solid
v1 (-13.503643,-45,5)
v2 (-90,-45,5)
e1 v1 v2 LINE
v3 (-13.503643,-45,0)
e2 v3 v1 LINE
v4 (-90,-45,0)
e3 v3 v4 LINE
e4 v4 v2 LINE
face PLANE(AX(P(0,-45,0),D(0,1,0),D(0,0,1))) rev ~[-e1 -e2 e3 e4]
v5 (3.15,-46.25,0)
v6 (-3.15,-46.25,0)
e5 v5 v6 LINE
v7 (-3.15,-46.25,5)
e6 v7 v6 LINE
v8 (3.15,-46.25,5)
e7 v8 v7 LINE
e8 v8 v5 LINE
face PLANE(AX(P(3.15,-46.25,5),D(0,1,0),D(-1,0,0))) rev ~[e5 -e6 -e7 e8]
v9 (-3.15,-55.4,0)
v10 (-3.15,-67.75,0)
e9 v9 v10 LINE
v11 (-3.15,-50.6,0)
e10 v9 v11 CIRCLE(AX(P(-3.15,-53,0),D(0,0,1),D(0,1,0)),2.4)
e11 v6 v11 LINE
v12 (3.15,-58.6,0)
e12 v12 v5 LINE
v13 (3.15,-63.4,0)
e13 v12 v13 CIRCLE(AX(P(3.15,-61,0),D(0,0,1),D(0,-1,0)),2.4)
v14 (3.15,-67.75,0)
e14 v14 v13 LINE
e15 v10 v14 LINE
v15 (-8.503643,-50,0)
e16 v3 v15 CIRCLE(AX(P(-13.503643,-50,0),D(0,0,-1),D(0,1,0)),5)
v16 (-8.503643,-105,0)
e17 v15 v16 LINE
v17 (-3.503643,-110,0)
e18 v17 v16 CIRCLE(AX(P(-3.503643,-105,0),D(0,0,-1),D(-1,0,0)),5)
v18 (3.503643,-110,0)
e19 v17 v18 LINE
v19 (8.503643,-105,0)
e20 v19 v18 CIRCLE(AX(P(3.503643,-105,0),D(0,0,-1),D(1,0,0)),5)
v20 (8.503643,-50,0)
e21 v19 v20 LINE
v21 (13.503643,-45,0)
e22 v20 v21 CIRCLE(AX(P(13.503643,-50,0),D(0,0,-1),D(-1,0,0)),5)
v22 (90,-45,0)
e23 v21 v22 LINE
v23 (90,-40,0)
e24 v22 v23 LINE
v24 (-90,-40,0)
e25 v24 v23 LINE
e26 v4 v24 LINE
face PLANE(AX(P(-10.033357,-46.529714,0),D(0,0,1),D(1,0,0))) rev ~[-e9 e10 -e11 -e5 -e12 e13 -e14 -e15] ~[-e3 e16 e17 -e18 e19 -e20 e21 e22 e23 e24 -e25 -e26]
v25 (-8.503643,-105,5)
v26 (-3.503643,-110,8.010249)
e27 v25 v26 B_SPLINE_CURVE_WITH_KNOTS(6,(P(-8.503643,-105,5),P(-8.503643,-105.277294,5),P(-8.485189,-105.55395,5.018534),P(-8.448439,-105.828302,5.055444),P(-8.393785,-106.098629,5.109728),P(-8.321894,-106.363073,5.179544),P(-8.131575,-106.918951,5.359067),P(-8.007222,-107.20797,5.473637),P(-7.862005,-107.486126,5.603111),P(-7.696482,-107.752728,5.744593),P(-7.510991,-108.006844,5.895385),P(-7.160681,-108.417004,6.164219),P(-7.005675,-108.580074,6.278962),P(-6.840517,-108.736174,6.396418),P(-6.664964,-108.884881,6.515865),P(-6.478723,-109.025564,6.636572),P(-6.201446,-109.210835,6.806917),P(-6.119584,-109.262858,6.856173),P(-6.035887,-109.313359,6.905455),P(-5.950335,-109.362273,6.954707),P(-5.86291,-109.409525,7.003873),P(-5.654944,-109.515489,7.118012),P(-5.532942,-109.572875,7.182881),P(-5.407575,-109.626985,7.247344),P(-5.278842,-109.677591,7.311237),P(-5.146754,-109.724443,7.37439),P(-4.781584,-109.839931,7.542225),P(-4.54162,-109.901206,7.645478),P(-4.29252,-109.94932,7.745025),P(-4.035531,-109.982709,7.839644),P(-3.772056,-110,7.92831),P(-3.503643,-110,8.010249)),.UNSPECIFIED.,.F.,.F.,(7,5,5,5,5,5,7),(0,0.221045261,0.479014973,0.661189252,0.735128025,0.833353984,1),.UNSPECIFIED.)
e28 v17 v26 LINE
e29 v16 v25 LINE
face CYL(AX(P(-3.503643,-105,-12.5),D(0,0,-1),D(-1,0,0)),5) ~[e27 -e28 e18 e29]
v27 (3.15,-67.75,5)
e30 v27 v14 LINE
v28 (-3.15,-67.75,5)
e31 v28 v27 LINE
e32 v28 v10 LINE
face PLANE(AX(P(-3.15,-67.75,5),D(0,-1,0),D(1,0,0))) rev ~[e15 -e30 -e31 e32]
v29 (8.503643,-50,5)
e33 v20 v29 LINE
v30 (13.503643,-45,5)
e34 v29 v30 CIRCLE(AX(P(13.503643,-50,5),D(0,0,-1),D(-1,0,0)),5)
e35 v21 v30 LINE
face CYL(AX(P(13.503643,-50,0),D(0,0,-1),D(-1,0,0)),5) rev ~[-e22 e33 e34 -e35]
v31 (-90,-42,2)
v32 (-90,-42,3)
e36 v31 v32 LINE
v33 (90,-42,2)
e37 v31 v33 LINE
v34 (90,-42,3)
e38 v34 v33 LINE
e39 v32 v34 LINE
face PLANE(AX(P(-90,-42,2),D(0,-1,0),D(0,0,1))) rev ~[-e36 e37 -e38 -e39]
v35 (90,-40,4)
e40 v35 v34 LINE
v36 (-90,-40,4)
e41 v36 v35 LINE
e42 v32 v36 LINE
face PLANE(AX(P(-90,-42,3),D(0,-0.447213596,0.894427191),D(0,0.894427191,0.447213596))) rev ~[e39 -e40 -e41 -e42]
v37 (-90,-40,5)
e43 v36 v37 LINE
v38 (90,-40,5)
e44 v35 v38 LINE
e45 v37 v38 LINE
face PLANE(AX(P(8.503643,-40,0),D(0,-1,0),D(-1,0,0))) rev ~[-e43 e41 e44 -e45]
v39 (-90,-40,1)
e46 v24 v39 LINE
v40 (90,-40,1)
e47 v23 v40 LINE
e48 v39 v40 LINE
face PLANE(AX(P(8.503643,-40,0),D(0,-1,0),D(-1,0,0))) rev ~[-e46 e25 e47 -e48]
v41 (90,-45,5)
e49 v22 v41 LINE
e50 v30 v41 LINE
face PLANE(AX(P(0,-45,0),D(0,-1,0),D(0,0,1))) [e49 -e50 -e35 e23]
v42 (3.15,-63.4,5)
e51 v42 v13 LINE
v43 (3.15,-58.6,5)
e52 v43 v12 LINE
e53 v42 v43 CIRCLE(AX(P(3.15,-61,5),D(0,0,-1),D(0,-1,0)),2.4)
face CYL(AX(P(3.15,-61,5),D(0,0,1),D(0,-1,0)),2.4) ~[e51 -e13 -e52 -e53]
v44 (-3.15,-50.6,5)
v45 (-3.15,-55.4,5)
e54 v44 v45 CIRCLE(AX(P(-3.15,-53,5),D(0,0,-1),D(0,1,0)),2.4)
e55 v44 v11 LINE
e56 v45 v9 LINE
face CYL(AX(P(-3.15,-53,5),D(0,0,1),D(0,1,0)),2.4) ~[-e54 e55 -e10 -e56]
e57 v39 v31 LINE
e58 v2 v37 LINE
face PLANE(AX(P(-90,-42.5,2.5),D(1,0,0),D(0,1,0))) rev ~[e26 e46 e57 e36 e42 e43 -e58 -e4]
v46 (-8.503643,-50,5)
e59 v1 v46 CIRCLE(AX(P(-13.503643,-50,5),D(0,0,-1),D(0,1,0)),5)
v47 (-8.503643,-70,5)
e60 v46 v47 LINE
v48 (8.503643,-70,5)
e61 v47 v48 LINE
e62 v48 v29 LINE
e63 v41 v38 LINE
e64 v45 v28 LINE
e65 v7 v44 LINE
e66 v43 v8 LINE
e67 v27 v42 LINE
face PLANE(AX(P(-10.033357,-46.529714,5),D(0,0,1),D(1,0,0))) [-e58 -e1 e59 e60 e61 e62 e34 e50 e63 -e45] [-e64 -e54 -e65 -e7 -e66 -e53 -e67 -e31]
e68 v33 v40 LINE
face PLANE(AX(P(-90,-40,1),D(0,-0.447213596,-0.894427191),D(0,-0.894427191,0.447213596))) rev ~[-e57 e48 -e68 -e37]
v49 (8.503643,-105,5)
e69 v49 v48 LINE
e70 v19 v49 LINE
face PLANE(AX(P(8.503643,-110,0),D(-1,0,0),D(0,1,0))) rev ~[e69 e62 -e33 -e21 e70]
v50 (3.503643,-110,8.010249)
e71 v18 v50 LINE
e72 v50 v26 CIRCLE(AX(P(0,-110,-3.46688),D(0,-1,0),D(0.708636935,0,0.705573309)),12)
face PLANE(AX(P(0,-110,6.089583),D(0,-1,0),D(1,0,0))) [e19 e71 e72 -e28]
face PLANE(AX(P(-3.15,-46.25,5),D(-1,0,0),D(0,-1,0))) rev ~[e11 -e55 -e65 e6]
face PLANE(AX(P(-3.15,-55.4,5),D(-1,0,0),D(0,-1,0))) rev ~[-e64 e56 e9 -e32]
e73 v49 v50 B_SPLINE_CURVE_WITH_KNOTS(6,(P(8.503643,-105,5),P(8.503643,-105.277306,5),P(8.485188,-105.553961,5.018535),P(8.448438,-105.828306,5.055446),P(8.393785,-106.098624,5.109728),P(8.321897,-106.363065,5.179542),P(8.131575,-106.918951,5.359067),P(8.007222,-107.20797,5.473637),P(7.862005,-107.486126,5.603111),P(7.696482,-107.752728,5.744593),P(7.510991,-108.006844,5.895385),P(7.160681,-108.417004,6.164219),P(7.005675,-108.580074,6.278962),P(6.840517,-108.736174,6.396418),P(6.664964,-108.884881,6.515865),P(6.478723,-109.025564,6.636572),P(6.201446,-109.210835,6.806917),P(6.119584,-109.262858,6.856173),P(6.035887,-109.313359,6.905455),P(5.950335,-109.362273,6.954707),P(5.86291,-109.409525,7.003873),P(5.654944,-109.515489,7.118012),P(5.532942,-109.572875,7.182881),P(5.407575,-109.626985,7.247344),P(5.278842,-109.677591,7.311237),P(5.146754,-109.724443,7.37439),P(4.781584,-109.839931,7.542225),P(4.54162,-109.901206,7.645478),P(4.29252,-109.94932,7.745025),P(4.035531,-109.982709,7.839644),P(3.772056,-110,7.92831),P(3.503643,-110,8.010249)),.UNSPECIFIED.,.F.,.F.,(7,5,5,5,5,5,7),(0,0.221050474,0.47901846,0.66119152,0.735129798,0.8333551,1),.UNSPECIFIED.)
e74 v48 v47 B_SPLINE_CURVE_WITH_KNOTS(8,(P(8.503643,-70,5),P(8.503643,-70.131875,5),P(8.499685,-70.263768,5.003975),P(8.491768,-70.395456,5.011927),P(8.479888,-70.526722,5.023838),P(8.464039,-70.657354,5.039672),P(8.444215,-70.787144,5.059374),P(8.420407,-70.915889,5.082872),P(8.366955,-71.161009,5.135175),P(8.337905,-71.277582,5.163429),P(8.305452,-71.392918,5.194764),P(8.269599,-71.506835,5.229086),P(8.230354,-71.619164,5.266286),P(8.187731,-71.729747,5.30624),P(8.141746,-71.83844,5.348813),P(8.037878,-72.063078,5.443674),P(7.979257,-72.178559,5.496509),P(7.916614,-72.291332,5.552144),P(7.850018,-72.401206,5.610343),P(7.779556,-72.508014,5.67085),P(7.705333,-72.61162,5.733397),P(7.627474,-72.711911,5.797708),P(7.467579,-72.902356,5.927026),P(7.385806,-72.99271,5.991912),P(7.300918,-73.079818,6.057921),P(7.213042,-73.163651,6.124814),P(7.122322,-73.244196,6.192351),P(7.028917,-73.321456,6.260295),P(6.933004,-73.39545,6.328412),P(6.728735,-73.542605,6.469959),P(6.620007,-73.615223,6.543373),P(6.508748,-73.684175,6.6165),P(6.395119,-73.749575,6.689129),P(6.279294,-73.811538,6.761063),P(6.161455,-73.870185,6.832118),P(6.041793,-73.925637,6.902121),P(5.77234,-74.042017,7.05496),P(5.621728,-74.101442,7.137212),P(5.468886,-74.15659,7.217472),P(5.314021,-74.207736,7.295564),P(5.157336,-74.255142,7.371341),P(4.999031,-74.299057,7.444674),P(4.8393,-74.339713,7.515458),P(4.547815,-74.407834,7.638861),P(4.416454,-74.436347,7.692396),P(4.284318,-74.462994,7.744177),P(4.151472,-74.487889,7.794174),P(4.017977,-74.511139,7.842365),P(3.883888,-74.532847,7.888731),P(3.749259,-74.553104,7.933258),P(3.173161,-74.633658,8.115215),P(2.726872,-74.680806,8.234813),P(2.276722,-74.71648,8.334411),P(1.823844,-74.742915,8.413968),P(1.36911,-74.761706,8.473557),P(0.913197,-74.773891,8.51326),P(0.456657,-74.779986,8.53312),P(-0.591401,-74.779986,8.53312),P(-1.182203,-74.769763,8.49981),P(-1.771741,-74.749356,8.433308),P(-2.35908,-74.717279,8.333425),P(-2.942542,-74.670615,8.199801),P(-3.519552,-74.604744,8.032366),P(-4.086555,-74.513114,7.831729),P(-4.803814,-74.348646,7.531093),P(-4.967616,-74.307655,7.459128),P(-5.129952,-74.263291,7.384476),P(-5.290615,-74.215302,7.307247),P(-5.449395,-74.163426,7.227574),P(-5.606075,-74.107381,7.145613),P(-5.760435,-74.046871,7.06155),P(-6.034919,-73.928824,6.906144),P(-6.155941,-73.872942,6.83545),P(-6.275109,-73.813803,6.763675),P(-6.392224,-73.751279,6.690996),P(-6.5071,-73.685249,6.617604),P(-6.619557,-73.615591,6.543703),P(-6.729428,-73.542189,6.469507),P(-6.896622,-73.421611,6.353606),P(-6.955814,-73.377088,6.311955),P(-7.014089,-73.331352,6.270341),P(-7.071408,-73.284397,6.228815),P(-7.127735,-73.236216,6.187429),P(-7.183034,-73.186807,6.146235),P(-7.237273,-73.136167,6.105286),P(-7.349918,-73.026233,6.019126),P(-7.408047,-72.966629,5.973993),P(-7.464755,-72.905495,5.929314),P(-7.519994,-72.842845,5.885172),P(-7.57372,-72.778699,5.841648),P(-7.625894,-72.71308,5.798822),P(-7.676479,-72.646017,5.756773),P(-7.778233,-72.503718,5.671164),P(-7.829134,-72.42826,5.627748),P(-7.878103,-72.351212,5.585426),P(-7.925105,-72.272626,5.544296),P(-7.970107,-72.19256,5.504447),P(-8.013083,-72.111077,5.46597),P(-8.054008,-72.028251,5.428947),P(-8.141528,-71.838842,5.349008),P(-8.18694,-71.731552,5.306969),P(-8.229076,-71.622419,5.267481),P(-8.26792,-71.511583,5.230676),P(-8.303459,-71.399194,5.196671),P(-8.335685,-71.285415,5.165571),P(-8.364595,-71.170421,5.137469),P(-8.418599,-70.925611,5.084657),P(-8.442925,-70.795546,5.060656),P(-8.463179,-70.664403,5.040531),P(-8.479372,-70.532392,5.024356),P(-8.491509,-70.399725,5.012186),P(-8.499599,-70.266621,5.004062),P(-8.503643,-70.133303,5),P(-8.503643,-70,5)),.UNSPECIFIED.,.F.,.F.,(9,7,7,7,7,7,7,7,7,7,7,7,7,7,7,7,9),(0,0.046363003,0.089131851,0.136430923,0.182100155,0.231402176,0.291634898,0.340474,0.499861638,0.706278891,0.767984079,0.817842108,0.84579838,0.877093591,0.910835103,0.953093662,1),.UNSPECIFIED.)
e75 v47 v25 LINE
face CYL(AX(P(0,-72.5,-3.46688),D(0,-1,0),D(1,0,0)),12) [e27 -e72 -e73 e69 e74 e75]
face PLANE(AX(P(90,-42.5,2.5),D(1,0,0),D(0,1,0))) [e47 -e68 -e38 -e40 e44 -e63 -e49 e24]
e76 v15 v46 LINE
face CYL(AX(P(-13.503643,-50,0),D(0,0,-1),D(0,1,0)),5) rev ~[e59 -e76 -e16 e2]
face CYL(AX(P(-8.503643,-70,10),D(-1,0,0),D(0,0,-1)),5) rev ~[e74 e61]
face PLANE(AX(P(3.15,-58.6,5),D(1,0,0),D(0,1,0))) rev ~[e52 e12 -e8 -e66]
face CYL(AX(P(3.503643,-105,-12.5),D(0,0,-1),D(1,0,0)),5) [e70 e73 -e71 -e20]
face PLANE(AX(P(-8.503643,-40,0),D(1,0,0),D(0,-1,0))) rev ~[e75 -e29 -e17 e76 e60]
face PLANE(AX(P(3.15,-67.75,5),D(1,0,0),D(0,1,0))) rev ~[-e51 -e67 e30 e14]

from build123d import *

# Parameters (mm, degrees)
F1_DEPTH      = 5
F3_DEPTH      = 5.001
F5_DEPTH      = 35
F6_W          = 5
F6_H          = 5
F7_DEPTH      = 90
F7_DEPTH_BACK = 90
F9_DEPTH      = 180.001
F10_T1_DEPTH  = 5
F10_T6_DEPTH  = 17.0072864353
F10_S7_R      = 12
F10_T8_DEPTH  = 11
F10_T9_DEPTH  = 30


# Not quite as in the source:
# - a fillet or chamfer that OpenCascade refuses, or shapes differently, is made with other operations: its cross-section is extruded or revolved along the edge and cut away or added


with BuildPart() as f1:
    # F0 (on Top) → F1 (new body)
    with BuildSketch(Plane.XY):
        Polygon((8.5036432176, -40), (-8.5036432176, -40), (-8.5036432176, -110), (0, -110), (8.5036432176, -110), align=None)
    extrude(amount=F1_DEPTH)

    # F2 (on face) → F3 (cut, through all)
    with BuildSketch(Plane.XY.offset(5)):
        with BuildLine():
            Line((-3.15, -67.75), (3.15, -67.75))
            Line((3.15, -67.75), (3.15, -63.4))
            ThreePointArc((3.15, -63.4), (0.75, -61), (3.15, -58.6))
            Line((3.15, -58.6), (3.15, -46.25))
            Line((3.15, -46.25), (-3.15, -46.25))
            Line((-3.15, -46.25), (-3.15, -50.6))
            ThreePointArc((-3.15, -50.6), (-0.75, -53), (-3.15, -55.4))
            Line((-3.15, -55.4), (-3.15, -67.75))
        make_face()
    extrude(amount=-F3_DEPTH, mode=Mode.SUBTRACT)

    # F4 (on face) → F5 (join)
    with BuildSketch(Plane.XZ.offset(110)):
        with BuildLine():
            ThreePointArc((8.5036432176, 5), (0, 8.5331202898), (-8.5036432176, 5))
            Line((-8.5036432176, 5), (8.5036432176, 5))
        make_face()
    extrude(amount=-F5_DEPTH)

    # F6 (on Right) → F7 (join, two sides)
    with BuildSketch(Plane.YZ) as f7_sk:
        with Locations((-42.5, 2.5)):
            Rectangle(F6_W, F6_H)
    extrude(amount=F7_DEPTH)
    extrude(f7_sk.sketch, amount=-F7_DEPTH_BACK)

    # F8 (on face) → F9 (cut, through all)
    with BuildSketch(Plane(origin=(-90, 0, 0), x_dir=(0, -1, 0), z_dir=(-1, 0, 0))):
        Polygon((40, 1), (42, 2), (42, 3), (40, 4), align=None)
    extrude(amount=-F9_DEPTH, mode=Mode.SUBTRACT)

    # F10: fillet of radius 5 on 5 edges, made by hand

    # F10_s2 → F10_t1 (join)
    with BuildSketch(Plane.XY):
        with BuildLine():
            ThreePointArc((-13.5036432176, -45), (-9.9681093117, -46.4644660941), (-8.5036432176, -50))
            Line((-8.5036432176, -50), (-8.5036432176, -45))
            Line((-8.5036432176, -45), (-13.5036432176, -45))
        make_face()
        with BuildLine():
            ThreePointArc((8.5036432176, -50), (9.9681093117, -46.4644660941), (13.5036432176, -45))
            Line((13.5036432176, -45), (8.5036432176, -45))
            Line((8.5036432176, -45), (8.5036432176, -50))
        make_face()
    extrude(amount=F10_T1_DEPTH)


with BuildPart() as f10_tool4:
    # F10_s5 → F10_t6 (new body)
    with BuildSketch(Plane.YZ.offset(-8.5036432176)):
        with BuildLine():
            ThreePointArc((-70, 5), (-73.5355339059, 6.4644660941), (-75, 10))
            Line((-75, 10), (-75, 5))
            Line((-75, 5), (-70, 5))
        make_face()
    extrude(amount=F10_T6_DEPTH)

    # F10_s7 → F10_t8 (intersect, symmetric)
    with BuildSketch(Plane.XZ.offset(72.5)):
        with Locations((0, -3.4668797102)):
            Circle(F10_S7_R)
    extrude(amount=F10_T8_DEPTH, both=True, mode=Mode.INTERSECT)


with BuildPart() as f1_1:
    add(f1.part)

    # F10_t3: union F10_tool4
    add(f10_tool4.part)

    # F10_s10 → F10_t9 (cut)
    with BuildSketch(Plane.XY.offset(-12.5)):
        with BuildLine():
            ThreePointArc((-8.5036432176, -105), (-7.0391771236, -108.5355339059), (-3.5036432176, -110))
            Line((-3.5036432176, -110), (-8.5036432176, -110))
            Line((-8.5036432176, -110), (-8.5036432176, -105))
        make_face()
        with BuildLine():
            ThreePointArc((8.5036432176, -105), (7.0391771236, -108.5355339059), (3.5036432176, -110))
            Line((3.5036432176, -110), (8.5036432176, -110))
            Line((8.5036432176, -110), (8.5036432176, -105))
        make_face()
    extrude(amount=F10_T9_DEPTH, mode=Mode.SUBTRACT)


solid = f1_1.part
